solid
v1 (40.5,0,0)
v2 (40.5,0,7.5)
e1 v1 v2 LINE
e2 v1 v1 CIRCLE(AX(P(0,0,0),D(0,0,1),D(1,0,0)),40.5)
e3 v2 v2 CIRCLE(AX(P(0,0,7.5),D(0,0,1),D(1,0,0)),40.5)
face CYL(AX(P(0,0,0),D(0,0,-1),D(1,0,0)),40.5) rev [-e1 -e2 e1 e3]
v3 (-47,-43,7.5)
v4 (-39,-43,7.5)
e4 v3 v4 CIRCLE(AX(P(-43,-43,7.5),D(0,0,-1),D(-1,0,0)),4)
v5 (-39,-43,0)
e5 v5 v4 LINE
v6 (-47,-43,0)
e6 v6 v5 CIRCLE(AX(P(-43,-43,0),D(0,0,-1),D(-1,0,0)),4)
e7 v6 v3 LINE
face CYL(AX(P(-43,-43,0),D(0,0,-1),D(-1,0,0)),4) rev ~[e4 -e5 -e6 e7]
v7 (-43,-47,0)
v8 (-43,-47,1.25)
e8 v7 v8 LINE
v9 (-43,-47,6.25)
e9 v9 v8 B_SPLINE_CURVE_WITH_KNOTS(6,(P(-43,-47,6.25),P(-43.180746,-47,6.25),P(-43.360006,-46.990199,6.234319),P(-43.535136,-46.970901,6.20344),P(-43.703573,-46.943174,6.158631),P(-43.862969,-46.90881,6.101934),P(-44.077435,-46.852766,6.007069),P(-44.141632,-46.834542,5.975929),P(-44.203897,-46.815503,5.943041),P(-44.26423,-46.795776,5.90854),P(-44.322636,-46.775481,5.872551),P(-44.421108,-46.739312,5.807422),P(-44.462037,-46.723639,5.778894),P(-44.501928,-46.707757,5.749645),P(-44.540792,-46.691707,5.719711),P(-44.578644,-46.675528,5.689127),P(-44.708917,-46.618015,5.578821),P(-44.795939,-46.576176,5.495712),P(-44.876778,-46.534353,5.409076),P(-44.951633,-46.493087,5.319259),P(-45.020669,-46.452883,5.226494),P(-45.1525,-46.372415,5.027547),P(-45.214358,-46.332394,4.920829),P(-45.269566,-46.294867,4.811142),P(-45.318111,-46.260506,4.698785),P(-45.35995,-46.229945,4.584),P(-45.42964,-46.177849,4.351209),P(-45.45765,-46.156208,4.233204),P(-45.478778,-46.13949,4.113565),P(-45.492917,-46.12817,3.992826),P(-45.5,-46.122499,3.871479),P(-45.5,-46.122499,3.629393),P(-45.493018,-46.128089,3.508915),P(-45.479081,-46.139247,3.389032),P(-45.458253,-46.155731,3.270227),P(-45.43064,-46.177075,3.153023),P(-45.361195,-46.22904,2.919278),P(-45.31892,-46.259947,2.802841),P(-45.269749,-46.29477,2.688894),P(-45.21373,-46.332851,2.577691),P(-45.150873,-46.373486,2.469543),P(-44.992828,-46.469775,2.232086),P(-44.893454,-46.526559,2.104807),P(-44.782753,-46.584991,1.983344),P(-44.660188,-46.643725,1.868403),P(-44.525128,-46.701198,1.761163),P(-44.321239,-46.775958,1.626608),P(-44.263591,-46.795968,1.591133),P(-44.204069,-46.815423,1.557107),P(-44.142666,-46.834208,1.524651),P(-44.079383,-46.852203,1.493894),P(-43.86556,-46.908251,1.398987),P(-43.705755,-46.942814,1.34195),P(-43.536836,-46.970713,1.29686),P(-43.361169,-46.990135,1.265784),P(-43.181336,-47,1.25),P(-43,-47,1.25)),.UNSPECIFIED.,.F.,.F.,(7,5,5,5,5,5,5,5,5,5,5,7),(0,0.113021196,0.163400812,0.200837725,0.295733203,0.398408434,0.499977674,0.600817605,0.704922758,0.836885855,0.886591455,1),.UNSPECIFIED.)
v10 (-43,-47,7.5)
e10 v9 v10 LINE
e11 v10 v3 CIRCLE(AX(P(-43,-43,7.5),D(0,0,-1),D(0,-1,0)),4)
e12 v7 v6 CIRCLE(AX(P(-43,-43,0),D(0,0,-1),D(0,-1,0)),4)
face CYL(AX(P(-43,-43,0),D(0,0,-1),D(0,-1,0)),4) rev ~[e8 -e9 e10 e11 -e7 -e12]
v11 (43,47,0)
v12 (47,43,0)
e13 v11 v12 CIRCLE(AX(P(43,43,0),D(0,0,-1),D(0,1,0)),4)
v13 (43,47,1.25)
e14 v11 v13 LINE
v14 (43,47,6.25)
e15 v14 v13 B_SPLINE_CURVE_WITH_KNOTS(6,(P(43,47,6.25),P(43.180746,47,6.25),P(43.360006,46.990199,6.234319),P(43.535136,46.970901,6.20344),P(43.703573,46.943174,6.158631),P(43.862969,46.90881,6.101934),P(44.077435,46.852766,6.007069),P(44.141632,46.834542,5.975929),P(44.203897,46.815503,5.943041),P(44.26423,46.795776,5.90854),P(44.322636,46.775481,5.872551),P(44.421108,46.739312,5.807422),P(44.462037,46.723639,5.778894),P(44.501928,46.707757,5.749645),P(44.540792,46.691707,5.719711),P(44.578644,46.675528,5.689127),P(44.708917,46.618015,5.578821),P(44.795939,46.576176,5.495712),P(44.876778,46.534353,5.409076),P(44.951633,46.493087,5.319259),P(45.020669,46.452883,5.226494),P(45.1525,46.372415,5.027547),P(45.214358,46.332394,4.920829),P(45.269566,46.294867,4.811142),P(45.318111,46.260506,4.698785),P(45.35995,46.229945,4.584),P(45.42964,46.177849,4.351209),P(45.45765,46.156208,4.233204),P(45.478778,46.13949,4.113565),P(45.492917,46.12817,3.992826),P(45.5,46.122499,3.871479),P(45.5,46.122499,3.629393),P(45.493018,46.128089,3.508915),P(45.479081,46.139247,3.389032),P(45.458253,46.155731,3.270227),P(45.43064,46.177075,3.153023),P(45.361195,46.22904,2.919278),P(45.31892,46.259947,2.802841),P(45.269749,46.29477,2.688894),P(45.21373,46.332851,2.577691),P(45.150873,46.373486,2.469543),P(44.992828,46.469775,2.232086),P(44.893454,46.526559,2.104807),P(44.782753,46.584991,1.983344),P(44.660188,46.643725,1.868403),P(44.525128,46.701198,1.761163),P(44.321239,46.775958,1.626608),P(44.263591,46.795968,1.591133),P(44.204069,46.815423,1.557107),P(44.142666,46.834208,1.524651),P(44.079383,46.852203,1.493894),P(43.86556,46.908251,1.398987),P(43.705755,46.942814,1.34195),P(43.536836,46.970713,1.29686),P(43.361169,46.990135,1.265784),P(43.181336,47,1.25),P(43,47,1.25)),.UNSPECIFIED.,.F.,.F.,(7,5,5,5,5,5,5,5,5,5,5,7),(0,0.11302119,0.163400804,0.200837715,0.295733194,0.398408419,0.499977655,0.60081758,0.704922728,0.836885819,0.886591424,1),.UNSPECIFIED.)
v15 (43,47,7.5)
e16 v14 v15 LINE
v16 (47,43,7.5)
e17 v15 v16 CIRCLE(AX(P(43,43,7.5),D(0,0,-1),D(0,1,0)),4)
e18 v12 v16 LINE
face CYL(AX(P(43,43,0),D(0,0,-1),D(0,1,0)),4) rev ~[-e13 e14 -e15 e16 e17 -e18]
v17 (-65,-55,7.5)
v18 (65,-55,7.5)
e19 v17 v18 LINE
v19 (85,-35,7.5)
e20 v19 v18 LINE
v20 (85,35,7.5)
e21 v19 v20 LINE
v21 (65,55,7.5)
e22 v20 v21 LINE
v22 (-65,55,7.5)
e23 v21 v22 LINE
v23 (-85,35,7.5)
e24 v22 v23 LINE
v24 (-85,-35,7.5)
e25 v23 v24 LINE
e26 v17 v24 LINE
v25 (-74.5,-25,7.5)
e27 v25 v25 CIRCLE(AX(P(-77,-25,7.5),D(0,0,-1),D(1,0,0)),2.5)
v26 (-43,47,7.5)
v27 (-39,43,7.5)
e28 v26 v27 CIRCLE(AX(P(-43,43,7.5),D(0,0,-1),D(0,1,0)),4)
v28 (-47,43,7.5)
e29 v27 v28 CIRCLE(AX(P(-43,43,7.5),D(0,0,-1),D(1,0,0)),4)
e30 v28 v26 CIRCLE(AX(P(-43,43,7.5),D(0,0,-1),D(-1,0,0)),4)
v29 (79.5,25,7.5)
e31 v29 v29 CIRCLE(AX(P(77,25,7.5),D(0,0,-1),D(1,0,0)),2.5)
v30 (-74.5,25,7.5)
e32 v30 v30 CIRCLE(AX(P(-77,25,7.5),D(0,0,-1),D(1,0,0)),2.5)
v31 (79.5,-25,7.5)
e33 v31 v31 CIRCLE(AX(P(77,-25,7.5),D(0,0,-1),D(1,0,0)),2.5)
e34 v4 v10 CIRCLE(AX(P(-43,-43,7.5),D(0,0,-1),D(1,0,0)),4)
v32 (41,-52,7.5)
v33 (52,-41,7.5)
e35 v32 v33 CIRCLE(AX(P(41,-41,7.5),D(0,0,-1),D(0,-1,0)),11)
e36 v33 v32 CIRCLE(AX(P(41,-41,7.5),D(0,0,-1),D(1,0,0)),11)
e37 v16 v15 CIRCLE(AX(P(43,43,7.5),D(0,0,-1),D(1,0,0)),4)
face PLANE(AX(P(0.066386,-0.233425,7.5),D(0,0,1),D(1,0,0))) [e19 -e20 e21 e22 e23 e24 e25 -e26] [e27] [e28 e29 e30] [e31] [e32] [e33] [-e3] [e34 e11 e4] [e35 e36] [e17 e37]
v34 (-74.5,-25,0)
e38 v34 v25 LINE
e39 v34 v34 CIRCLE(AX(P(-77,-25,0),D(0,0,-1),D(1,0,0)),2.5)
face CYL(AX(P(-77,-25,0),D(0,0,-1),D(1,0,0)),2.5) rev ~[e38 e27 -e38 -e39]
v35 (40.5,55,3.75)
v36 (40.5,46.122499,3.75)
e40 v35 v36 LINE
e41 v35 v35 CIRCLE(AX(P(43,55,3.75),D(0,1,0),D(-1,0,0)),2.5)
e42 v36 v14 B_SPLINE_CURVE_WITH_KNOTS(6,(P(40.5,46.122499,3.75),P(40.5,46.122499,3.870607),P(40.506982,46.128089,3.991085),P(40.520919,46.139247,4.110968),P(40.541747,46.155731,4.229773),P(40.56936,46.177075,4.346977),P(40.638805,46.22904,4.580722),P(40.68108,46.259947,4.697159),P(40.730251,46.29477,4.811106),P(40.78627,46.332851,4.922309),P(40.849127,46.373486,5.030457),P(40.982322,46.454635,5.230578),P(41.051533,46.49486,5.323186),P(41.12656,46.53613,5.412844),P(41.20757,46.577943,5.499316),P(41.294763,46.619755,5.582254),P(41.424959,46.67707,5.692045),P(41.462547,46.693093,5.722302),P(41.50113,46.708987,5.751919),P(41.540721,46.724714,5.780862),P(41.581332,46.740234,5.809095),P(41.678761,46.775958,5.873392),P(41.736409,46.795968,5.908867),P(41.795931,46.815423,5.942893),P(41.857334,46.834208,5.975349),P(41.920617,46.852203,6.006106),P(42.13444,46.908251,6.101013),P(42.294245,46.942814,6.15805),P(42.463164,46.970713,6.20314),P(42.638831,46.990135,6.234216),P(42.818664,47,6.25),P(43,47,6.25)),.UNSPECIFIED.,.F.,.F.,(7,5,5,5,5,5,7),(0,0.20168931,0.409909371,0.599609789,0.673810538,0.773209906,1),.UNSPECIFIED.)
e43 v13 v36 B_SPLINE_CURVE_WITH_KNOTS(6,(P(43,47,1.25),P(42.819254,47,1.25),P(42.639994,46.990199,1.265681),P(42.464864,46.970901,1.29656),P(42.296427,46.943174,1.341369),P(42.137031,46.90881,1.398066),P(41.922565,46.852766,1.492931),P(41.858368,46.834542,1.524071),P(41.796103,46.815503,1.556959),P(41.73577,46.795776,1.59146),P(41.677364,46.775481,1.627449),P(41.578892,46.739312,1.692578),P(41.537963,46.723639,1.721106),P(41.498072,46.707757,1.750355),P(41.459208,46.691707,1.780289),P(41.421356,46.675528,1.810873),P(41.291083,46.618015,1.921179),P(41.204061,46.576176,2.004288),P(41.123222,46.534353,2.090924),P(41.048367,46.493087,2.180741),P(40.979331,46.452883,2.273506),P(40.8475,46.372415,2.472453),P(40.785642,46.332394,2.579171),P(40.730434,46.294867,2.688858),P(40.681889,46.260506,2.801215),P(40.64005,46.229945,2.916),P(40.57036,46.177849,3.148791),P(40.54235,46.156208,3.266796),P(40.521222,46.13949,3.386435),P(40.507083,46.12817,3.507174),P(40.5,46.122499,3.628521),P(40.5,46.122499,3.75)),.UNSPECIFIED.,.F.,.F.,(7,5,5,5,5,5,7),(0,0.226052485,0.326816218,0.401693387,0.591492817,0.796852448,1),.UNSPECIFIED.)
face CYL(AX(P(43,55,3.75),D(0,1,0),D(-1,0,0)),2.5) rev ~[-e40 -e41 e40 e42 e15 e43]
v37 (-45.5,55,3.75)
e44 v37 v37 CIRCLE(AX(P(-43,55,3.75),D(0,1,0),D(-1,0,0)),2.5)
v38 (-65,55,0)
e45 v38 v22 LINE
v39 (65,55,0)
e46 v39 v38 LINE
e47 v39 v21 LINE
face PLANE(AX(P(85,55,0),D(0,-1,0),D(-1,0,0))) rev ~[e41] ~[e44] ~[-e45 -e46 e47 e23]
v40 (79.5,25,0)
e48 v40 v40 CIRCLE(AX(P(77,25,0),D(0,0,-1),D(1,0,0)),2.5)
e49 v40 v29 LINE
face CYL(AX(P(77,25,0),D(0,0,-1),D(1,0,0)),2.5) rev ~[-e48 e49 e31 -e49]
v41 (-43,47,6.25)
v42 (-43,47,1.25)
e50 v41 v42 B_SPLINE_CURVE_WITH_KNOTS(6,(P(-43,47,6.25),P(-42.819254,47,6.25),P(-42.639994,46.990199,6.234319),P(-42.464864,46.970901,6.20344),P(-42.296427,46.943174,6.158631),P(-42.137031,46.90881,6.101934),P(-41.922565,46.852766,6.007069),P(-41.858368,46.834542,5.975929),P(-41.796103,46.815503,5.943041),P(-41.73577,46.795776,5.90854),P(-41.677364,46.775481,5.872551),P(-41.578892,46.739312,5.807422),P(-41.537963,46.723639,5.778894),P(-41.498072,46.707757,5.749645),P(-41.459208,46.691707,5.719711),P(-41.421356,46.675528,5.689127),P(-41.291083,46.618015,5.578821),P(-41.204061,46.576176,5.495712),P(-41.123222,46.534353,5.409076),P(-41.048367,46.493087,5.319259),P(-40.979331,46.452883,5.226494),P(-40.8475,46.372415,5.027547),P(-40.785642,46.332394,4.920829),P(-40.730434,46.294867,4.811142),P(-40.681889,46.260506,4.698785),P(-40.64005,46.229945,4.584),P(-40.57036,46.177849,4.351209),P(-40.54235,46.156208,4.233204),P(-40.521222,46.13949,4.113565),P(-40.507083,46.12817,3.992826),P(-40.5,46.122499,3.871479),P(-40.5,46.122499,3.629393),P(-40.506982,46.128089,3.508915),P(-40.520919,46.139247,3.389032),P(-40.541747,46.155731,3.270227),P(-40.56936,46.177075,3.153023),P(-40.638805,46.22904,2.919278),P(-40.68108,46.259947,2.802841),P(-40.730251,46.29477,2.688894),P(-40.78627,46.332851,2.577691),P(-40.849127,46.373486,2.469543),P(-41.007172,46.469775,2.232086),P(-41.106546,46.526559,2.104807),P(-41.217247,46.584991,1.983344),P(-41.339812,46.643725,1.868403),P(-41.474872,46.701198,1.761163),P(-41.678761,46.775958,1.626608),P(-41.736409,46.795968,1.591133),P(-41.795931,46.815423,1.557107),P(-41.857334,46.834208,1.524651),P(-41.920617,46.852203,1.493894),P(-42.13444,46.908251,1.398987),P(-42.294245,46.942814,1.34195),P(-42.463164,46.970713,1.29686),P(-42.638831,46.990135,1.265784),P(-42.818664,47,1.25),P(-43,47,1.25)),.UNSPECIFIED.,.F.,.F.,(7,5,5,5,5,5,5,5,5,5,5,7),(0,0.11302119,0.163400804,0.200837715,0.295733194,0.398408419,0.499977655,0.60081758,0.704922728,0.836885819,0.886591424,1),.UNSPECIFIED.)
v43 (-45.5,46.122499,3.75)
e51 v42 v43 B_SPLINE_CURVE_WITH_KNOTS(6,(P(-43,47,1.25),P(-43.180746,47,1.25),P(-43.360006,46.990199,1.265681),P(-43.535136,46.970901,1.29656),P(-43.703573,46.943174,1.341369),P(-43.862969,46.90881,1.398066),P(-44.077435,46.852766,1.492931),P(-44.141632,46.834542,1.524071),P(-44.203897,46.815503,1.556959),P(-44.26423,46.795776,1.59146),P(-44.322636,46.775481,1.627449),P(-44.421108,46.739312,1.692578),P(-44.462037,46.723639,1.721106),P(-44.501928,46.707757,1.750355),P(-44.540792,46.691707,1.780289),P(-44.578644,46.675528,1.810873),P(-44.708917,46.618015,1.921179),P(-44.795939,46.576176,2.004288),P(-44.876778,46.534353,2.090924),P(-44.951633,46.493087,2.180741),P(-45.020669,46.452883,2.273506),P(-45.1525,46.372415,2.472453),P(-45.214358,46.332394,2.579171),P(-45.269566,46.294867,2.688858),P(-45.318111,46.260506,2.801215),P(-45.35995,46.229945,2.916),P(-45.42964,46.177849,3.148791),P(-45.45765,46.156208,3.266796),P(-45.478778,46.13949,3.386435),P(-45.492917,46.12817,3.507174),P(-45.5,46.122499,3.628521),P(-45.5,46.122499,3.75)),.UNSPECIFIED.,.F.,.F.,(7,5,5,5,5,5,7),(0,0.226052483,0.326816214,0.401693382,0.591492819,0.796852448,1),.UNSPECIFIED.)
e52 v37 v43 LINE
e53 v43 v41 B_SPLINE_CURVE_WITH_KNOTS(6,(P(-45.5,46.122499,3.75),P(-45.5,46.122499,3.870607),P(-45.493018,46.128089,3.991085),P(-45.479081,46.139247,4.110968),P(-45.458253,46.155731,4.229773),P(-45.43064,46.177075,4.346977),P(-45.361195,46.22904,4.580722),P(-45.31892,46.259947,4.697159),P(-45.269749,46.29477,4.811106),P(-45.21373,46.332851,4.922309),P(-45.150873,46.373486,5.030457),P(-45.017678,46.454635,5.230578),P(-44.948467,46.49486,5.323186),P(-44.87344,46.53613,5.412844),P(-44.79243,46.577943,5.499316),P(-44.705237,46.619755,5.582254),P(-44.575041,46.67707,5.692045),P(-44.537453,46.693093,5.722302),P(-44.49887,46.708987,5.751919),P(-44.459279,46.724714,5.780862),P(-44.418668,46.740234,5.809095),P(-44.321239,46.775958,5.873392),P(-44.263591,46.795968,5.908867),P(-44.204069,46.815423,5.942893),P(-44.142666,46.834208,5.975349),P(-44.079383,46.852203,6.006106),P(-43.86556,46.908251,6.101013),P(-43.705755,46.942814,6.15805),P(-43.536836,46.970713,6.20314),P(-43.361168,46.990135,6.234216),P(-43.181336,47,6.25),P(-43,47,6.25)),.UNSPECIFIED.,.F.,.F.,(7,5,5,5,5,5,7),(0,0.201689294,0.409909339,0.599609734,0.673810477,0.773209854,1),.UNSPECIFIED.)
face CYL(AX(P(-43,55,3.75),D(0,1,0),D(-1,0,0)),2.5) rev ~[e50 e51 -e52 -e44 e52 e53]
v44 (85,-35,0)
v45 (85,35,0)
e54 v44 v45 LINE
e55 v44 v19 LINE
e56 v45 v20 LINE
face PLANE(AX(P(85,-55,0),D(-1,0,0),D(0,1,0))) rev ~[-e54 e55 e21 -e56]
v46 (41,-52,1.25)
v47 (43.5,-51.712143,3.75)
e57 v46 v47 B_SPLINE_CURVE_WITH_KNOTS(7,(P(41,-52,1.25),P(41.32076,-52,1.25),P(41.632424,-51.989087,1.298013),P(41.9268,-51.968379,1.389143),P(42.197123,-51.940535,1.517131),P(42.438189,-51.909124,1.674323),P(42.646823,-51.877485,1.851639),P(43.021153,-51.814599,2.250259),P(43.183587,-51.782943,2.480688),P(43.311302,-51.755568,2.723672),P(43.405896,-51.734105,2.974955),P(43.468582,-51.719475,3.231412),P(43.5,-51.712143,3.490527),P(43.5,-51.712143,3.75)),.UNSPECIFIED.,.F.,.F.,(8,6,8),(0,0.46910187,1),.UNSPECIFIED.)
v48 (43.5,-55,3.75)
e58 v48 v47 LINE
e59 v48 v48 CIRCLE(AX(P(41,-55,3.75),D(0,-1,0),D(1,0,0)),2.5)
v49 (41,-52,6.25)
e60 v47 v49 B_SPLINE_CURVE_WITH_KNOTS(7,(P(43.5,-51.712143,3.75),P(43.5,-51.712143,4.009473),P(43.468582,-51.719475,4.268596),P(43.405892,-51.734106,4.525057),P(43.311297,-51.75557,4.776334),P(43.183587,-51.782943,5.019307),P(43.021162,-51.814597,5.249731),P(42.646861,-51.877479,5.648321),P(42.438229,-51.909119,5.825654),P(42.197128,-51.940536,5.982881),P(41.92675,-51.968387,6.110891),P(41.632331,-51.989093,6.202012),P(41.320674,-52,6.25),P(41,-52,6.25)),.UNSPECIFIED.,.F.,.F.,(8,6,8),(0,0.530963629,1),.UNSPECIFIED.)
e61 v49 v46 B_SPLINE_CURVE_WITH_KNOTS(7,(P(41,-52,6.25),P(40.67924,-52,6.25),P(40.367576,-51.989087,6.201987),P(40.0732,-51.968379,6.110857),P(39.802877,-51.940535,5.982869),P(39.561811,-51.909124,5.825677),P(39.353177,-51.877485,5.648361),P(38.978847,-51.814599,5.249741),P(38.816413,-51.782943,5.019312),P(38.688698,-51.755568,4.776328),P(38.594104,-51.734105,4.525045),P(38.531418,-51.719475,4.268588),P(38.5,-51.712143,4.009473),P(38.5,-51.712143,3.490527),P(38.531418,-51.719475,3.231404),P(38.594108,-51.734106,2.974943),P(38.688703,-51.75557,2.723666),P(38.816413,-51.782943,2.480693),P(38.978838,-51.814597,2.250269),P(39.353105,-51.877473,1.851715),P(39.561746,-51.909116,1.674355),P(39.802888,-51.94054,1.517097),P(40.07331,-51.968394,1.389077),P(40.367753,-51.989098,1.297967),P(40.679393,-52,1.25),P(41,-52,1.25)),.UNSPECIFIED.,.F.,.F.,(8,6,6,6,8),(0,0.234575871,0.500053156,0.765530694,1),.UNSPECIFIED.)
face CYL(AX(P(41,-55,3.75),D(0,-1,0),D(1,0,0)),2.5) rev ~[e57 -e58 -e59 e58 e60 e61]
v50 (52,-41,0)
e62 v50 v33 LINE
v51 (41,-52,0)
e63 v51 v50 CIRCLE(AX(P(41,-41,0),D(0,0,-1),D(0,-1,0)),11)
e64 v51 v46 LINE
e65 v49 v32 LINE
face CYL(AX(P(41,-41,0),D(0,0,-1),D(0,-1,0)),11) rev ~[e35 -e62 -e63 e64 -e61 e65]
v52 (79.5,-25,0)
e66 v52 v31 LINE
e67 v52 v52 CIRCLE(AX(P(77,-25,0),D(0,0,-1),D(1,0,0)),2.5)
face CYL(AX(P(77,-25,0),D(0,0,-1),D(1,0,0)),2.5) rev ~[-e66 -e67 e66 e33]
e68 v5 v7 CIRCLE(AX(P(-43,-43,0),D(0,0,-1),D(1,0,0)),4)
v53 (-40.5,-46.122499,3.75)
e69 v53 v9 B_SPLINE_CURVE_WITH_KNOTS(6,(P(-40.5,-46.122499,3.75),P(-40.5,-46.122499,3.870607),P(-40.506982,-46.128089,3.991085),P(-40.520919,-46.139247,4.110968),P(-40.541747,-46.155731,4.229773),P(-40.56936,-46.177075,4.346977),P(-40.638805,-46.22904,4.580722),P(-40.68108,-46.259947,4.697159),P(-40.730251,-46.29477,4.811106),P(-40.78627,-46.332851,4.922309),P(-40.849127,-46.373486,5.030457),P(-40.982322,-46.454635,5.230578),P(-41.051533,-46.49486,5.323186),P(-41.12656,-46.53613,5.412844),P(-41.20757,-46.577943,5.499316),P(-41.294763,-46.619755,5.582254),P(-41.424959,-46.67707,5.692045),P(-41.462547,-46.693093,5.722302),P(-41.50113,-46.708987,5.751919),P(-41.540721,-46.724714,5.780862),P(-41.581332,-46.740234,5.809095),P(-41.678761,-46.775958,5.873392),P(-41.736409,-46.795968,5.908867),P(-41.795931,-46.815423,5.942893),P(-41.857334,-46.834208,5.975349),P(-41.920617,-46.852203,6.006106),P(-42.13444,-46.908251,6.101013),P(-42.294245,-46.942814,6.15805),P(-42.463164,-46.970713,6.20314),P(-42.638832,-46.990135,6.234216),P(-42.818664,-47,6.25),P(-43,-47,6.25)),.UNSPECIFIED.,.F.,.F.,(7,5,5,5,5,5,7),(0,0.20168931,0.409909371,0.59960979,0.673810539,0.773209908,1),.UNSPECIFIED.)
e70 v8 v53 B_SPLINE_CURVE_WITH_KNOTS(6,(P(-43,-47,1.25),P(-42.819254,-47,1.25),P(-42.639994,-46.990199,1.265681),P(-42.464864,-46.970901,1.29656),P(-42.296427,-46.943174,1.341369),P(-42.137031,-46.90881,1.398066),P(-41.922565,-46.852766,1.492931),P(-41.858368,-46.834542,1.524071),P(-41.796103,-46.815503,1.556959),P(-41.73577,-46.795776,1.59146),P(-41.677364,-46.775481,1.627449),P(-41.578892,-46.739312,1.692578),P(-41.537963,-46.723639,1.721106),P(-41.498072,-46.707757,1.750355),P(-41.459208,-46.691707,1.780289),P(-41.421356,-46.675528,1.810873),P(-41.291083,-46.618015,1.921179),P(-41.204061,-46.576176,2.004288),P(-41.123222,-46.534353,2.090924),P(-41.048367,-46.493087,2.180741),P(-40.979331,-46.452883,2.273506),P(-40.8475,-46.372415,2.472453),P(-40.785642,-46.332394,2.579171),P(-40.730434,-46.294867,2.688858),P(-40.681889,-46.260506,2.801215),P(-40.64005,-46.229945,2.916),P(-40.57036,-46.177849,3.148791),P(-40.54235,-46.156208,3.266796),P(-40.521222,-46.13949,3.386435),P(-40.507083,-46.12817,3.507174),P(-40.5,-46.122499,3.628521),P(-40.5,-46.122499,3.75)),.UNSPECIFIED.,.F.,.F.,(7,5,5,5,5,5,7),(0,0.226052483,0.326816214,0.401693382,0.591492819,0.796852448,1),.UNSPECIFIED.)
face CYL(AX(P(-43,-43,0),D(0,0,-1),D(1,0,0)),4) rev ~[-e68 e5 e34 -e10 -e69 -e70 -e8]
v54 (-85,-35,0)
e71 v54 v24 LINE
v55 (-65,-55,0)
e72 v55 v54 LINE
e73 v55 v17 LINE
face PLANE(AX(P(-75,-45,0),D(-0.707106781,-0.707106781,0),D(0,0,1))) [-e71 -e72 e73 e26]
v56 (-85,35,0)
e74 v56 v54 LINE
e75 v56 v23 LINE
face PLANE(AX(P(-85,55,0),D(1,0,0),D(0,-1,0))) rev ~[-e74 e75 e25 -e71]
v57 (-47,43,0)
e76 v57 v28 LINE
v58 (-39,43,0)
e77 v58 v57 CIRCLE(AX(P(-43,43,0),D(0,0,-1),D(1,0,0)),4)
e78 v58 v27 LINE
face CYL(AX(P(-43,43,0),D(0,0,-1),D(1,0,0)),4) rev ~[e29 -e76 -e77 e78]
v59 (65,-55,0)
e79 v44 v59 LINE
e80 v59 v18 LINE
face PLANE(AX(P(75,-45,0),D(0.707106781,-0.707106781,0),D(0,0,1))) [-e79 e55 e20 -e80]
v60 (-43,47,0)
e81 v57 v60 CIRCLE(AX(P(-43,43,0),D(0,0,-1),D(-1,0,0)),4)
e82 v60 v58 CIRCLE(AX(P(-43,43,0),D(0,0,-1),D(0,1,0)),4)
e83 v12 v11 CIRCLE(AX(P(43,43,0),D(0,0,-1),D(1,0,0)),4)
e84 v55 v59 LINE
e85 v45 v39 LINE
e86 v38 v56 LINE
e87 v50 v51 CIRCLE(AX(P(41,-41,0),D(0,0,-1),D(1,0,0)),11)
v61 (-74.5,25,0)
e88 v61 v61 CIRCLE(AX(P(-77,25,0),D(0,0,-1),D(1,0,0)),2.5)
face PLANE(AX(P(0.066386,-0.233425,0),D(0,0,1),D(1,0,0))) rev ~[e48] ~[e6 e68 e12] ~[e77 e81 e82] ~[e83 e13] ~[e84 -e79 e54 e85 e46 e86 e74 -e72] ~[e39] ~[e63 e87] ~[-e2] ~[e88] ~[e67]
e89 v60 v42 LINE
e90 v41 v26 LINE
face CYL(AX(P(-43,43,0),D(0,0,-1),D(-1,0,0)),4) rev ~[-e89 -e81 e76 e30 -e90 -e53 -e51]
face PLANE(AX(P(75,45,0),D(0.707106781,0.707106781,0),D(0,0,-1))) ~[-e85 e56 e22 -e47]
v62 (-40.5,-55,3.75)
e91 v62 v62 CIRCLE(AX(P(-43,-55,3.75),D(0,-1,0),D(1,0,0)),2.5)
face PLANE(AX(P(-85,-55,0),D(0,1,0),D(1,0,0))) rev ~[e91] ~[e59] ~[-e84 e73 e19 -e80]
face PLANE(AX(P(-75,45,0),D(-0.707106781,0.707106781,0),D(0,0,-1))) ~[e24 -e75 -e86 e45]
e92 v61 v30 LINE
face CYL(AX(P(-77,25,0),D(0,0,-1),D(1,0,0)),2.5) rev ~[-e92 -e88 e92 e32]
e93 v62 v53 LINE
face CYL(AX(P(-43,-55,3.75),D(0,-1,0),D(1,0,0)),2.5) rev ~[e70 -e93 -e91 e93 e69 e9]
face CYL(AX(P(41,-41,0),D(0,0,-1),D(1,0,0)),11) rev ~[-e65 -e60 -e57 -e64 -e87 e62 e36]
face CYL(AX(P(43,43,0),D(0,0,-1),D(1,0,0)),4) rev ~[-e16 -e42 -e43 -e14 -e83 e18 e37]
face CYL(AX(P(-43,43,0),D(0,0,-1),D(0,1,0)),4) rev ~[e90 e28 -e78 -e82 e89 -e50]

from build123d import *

# Parameters (mm, degrees)
F0_R     = 40.5
F1_DEPTH = 7.5
F3_SIZE  = 20
F2_R     = 2.5
F4_DEPTH = 25
F5_R     = 2.5
F6_DEPTH = 10
F7_R     = 2.5
F8_DEPTH = 10


# Not quite as in the source:
# - a feature names something its author has since deleted; it is built from what else it names


with BuildPart() as f1:
    # F0 (on Top) → F1 (new body)
    with BuildSketch(Plane.XY):
        with BuildLine():
            Line((43, 47), (43, 55))
            Line((43, 55), (-43, 55))
            Line((-43, 55), (-43, 47))
            ThreePointArc((-43, 47), (-40.1715728753, 45.8284271247), (-39, 43))
            ThreePointArc((-39, 43), (-43, 39), (-47, 43))
            Line((-47, 43), (-85, 43))
            Line((-85, 43), (-85, -43))
            Line((-85, -43), (-47, -43))
            ThreePointArc((-47, -43), (-43, -39), (-39, -43))
            ThreePointArc((-39, -43), (-40.1715728753, -45.8284271247), (-43, -47))
            Line((-43, -47), (-43, -55))
            Line((-43, -55), (41, -55))
            Line((41, -55), (85, -55))
            Line((85, -55), (85, 43))
            Line((85, 43), (47, 43))
            ThreePointArc((47, 43), (40.1715728753, 40.1715728753), (43, 47))
        make_face()
        with BuildLine():
            ThreePointArc((52, -41), (48.7781745931, -48.7781745931), (41, -52))
            ThreePointArc((41, -52), (33.2218254069, -33.2218254069), (52, -41))
        make_face(mode=Mode.SUBTRACT)
        Circle(F0_R, mode=Mode.SUBTRACT)
        with BuildLine():
            Line((85, 43), (85, 55))
            Line((85, 55), (43, 55))
            Line((43, 55), (43, 47))
            ThreePointArc((43, 47), (45.8284271247, 45.8284271247), (47, 43))
            Line((47, 43), (85, 43))
        make_face()
        with BuildLine():
            Line((-85, -55), (-43, -55))
            Line((-43, -55), (-43, -47))
            ThreePointArc((-43, -47), (-45.8284271247, -45.8284271247), (-47, -43))
            Line((-47, -43), (-85, -43))
            Line((-85, -43), (-85, -55))
        make_face()
        with BuildLine():
            Line((-43, 47), (-43, 55))
            Line((-43, 55), (-85, 55))
            Line((-85, 55), (-85, 43))
            Line((-85, 43), (-47, 43))
            ThreePointArc((-47, 43), (-45.8284271247, 45.8284271247), (-43, 47))
        make_face()
    extrude(amount=F1_DEPTH)

    # F3
    f3_edges = [f1.edges().sort_by_distance(p)[0] for p in [
        (85, -55, 3.75),
        (-85, -55, 3.75),
        (-85, 55, 3.75),
        (85, 55, 3.75),
    ]]
    chamfer(f3_edges, length=F3_SIZE)

    # F2 (on face) → F4 (cut)
    with BuildSketch(Plane(origin=(0, 0, 0), x_dir=(1, 0, 0), z_dir=(0, 0, -1))):
        with Locations((77, -25)):
            Circle(F2_R)
        with Locations((77, 25)):
            Circle(F2_R)
        with Locations((-77, 25)):
            Circle(F2_R)
        with Locations((-77, -25)):
            Circle(F2_R)
    extrude(amount=-F4_DEPTH, mode=Mode.SUBTRACT)

    # F5 (on face) → F6 (cut)
    with BuildSketch(Plane.XZ.offset(55)):
        with Locations((-43, 3.75)):
            Circle(F5_R)
        with Locations((41, 3.75)):
            Circle(F5_R)
    extrude(amount=-F6_DEPTH, mode=Mode.SUBTRACT)

    # F7 (on face) → F8 (cut)
    with BuildSketch(Plane(origin=(0, 55, 0), x_dir=(-1, 0, 0), z_dir=(0, 1, 0))):
        with Locations((-43, 3.75)):
            Circle(F7_R)
        with Locations((43, 3.75)):
            Circle(F7_R)
    extrude(amount=-F8_DEPTH, mode=Mode.SUBTRACT)


solid = f1.part
